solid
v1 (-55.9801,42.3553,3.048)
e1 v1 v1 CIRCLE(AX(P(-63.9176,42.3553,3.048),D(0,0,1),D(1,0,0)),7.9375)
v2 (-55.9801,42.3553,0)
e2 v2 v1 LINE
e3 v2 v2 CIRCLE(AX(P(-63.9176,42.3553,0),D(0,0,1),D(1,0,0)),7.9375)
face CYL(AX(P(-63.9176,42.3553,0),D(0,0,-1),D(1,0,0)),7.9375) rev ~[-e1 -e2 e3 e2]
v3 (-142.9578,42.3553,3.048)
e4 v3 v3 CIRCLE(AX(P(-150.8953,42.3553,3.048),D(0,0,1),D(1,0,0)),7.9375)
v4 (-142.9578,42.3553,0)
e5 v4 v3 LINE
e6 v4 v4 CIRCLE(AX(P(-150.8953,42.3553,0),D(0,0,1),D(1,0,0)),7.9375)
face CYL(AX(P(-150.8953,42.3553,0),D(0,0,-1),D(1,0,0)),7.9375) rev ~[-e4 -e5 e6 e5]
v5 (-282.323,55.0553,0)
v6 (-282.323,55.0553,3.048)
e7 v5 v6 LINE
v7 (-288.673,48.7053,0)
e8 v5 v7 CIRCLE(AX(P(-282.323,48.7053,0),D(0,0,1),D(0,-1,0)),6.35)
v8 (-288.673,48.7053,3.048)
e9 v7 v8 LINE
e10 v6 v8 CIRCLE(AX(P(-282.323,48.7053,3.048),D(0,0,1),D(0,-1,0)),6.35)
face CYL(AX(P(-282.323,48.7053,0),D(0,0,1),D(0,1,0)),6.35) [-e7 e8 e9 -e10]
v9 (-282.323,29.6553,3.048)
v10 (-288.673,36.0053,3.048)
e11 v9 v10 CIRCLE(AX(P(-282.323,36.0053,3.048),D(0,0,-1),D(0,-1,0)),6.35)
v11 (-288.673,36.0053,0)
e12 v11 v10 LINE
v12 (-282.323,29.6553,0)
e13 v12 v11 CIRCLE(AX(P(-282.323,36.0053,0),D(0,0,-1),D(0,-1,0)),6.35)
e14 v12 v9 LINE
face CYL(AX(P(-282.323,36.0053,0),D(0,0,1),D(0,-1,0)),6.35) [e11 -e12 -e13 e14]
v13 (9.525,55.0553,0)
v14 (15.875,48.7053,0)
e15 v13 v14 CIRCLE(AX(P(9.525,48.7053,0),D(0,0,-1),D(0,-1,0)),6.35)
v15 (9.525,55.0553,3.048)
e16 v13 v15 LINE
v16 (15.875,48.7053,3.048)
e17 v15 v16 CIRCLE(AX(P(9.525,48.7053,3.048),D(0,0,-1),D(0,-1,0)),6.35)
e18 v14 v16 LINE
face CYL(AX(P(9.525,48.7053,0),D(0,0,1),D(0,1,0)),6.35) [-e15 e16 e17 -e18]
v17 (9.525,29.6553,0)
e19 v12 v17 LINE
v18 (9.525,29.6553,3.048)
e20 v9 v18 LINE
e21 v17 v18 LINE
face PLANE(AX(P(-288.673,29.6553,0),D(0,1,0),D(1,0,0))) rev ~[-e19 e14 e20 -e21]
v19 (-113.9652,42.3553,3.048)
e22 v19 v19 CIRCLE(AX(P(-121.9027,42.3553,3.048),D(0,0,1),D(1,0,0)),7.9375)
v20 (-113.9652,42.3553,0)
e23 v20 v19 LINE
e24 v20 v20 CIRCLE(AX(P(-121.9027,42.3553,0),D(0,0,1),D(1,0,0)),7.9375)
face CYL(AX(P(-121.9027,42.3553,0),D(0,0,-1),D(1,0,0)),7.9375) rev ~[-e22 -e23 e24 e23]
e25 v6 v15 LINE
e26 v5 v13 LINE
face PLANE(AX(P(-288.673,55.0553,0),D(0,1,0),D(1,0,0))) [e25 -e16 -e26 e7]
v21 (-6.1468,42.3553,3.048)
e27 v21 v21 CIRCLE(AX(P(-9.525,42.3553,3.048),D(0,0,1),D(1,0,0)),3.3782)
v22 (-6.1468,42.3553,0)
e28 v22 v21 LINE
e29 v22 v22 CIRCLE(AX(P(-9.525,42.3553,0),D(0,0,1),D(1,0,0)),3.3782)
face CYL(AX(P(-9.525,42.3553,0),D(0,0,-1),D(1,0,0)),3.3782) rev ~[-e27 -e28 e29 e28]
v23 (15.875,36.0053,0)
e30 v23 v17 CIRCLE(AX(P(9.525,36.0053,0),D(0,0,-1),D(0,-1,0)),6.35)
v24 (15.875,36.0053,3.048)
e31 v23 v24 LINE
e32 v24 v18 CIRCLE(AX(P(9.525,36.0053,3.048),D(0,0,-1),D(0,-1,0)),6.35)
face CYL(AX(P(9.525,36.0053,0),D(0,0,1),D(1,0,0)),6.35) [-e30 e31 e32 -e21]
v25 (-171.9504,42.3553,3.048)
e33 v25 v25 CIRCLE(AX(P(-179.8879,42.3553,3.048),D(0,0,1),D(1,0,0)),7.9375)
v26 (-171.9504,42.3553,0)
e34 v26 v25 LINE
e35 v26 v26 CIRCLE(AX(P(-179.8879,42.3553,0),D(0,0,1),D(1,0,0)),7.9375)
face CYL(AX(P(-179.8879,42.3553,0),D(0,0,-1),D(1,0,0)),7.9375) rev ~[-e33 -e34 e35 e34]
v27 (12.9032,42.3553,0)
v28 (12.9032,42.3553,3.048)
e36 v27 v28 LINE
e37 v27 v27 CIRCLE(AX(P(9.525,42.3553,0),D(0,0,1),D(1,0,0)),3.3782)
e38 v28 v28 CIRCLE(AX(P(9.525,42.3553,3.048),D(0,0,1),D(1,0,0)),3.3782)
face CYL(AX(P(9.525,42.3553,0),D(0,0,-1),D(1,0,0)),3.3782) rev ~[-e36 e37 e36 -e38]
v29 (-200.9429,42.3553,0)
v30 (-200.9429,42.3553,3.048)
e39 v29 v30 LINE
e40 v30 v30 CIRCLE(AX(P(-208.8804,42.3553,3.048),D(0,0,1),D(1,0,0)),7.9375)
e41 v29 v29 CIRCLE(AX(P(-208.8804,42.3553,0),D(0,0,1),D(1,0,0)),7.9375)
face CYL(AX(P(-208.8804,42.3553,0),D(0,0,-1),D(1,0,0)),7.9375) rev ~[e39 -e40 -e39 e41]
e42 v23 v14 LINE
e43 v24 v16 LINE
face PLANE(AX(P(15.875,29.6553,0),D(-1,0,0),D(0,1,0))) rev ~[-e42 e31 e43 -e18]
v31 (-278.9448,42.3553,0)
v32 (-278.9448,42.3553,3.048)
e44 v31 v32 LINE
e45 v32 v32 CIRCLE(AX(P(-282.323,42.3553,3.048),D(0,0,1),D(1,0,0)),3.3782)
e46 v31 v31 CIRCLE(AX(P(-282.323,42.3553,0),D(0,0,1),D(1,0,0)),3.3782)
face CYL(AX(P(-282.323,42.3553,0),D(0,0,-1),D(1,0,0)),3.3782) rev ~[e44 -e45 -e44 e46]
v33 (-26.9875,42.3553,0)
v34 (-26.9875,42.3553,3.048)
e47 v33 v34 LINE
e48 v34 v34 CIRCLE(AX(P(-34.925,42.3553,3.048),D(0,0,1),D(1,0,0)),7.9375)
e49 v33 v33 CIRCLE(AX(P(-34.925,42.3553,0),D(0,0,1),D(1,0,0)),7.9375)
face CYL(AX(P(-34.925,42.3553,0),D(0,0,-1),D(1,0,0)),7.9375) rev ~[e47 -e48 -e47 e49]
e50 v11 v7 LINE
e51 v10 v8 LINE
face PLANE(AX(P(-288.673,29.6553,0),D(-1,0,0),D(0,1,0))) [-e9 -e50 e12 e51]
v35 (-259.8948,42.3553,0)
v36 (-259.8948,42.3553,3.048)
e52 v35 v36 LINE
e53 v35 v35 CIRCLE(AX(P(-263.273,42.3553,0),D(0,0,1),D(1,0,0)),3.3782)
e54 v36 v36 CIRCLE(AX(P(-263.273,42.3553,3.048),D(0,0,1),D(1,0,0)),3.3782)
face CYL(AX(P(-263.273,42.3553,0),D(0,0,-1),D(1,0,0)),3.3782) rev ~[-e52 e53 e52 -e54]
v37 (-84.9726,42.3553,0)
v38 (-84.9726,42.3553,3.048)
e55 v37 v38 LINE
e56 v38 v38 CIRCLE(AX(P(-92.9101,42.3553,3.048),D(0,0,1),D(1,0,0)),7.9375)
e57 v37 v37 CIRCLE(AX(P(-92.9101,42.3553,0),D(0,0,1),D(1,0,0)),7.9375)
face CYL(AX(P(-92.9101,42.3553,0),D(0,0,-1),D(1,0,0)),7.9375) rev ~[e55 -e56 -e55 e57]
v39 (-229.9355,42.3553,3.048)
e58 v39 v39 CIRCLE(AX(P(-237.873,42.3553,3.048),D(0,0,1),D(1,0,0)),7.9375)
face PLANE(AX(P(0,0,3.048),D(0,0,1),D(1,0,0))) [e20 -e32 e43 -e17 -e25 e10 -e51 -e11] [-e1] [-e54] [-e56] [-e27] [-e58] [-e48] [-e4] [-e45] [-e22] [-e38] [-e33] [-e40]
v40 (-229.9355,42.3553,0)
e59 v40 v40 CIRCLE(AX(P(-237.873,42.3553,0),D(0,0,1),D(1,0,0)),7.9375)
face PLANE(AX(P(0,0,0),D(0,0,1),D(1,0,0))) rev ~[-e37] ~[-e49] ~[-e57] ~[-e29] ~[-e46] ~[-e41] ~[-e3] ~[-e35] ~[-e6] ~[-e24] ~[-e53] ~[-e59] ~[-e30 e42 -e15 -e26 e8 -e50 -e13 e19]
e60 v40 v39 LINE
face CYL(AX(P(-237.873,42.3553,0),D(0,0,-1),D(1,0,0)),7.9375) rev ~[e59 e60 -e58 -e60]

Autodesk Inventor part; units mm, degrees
ref_plane "YZ Plane" through (0, 0, 0) normal (1, 0, 0) x (0, 1, 0)
ref_plane "XZ Plane" through (0, 0, 0) normal (0, 1, 0) x (-1, 0, 0)
ref_plane "XY Plane" through (0, 0, 0) normal (0, 0, 1) x (1, 0, 0)
sketch "Sketch1" plane through (0, 0, 0) normal (0, 0, 1) x (1, 0, 0)
  arc A0 (-9.525, 55.0553) -> (-15.875, 48.7053) centre (-9.525, 48.7053) ccw construction
  line L0 (-15.875, 19.05) -> (-15.875, 48.7053) construction
  line L1 (-15.875, 19.05) -> (15.875, 19.05) construction
  line L2 (15.875, 48.7053) -> (15.875, 19.05) construction
  arc A1 (15.875, 48.7053) -> (9.525, 55.0553) centre (9.525, 48.7053) ccw construction
  line L3 (-9.525, 55.0553) -> (9.525, 55.0553) construction
  circle A2 centre (9.525, 42.3553) radius 3.3782 projected
  circle A3 centre (-9.525, 42.3553) radius 3.3782 projected
  arc A4 (-256.923, 48.7053) -> (-263.273, 55.0553) centre (-263.273, 48.7053) ccw construction
  line L4 (-282.323, 55.0553) -> (-263.273, 55.0553) construction
  arc A5 (-282.323, 55.0553) -> (-288.673, 48.7053) centre (-282.323, 48.7053) ccw construction
  line L5 (-288.673, 19.05) -> (-288.673, 48.7053) construction
  line L6 (-288.673, 19.05) -> (-256.923, 19.05) construction
  line L7 (-256.923, 48.7053) -> (-256.923, 19.05) construction
  circle A6 centre (-263.273, 42.3553) radius 3.3782 projected
  circle A7 centre (-282.323, 42.3553) radius 3.3782 projected
  line L8 (-288.673, 55.0553) -> (15.875, 55.0553)
  line L9 (-288.673, 29.6553) -> (15.875, 29.6553)
  line L10 (-288.673, 29.6553) -> (-288.673, 55.0553)
  line L11 (15.875, 29.6553) -> (15.875, 55.0553)
  line L12 (-288.673, 42.3553) -> (15.875, 42.3553) construction
  circle A8 centre (-237.873, 42.3553) radius 7.9375
  circle A9 centre (-208.8804, 42.3553) radius 7.9375
  circle A10 centre (-179.8879, 42.3553) radius 7.9375
  circle A11 centre (-150.8953, 42.3553) radius 7.9375
  circle A12 centre (-121.9027, 42.3553) radius 7.9375
  circle A13 centre (-92.9101, 42.3553) radius 7.9375
  circle A14 centre (-63.9176, 42.3553) radius 7.9375
  circle A15 centre (-34.925, 42.3553) radius 7.9375
  point P0 (0, 0)
  dimension "d1" = 25.4
  dimension "d2" = 12.7
  dimension "d33" = 15.875
  dimension "d35" = 304.548
  dimension "d36" = 50.8
  dimension "d39" = 28.9926
extrude "Plate1" add sketch "Sketch1" along normal blind 3.048
fillet "Corner Round1" radius 6.35 4 edges at (-288.673, 29.6553, 1.524) (-288.673, 55.0553, 1.524) (15.875, 29.6553, 1.524) (15.875, 55.0553, 1.524)
equation "\"d39\" = -0.285714 * d36 + 0.142857 * d35"
equation "\"BendRadius\" = Thickness"
equation "\"BendReliefWidth\" = Thickness"
equation "\"BendReliefDepth\" = 0.5 * Thickness"
equation "\"CornerReliefSize\" = 4 * Thickness"
equation "\"MinimumRemnant\" = 2 * Thickness"
equation "\"TransitionRadius\" = BendRadius"
equation "\"JacobiRadiusSize\" = BendRadius"
equation "\"GapSize\" = Thickness"
equation "\"d3\" = BendRadius"
equation "\"Thickness\" = 3.048"
properties part number "V5 Shooter Frame Channel P7" material "Aluminum-6061"
